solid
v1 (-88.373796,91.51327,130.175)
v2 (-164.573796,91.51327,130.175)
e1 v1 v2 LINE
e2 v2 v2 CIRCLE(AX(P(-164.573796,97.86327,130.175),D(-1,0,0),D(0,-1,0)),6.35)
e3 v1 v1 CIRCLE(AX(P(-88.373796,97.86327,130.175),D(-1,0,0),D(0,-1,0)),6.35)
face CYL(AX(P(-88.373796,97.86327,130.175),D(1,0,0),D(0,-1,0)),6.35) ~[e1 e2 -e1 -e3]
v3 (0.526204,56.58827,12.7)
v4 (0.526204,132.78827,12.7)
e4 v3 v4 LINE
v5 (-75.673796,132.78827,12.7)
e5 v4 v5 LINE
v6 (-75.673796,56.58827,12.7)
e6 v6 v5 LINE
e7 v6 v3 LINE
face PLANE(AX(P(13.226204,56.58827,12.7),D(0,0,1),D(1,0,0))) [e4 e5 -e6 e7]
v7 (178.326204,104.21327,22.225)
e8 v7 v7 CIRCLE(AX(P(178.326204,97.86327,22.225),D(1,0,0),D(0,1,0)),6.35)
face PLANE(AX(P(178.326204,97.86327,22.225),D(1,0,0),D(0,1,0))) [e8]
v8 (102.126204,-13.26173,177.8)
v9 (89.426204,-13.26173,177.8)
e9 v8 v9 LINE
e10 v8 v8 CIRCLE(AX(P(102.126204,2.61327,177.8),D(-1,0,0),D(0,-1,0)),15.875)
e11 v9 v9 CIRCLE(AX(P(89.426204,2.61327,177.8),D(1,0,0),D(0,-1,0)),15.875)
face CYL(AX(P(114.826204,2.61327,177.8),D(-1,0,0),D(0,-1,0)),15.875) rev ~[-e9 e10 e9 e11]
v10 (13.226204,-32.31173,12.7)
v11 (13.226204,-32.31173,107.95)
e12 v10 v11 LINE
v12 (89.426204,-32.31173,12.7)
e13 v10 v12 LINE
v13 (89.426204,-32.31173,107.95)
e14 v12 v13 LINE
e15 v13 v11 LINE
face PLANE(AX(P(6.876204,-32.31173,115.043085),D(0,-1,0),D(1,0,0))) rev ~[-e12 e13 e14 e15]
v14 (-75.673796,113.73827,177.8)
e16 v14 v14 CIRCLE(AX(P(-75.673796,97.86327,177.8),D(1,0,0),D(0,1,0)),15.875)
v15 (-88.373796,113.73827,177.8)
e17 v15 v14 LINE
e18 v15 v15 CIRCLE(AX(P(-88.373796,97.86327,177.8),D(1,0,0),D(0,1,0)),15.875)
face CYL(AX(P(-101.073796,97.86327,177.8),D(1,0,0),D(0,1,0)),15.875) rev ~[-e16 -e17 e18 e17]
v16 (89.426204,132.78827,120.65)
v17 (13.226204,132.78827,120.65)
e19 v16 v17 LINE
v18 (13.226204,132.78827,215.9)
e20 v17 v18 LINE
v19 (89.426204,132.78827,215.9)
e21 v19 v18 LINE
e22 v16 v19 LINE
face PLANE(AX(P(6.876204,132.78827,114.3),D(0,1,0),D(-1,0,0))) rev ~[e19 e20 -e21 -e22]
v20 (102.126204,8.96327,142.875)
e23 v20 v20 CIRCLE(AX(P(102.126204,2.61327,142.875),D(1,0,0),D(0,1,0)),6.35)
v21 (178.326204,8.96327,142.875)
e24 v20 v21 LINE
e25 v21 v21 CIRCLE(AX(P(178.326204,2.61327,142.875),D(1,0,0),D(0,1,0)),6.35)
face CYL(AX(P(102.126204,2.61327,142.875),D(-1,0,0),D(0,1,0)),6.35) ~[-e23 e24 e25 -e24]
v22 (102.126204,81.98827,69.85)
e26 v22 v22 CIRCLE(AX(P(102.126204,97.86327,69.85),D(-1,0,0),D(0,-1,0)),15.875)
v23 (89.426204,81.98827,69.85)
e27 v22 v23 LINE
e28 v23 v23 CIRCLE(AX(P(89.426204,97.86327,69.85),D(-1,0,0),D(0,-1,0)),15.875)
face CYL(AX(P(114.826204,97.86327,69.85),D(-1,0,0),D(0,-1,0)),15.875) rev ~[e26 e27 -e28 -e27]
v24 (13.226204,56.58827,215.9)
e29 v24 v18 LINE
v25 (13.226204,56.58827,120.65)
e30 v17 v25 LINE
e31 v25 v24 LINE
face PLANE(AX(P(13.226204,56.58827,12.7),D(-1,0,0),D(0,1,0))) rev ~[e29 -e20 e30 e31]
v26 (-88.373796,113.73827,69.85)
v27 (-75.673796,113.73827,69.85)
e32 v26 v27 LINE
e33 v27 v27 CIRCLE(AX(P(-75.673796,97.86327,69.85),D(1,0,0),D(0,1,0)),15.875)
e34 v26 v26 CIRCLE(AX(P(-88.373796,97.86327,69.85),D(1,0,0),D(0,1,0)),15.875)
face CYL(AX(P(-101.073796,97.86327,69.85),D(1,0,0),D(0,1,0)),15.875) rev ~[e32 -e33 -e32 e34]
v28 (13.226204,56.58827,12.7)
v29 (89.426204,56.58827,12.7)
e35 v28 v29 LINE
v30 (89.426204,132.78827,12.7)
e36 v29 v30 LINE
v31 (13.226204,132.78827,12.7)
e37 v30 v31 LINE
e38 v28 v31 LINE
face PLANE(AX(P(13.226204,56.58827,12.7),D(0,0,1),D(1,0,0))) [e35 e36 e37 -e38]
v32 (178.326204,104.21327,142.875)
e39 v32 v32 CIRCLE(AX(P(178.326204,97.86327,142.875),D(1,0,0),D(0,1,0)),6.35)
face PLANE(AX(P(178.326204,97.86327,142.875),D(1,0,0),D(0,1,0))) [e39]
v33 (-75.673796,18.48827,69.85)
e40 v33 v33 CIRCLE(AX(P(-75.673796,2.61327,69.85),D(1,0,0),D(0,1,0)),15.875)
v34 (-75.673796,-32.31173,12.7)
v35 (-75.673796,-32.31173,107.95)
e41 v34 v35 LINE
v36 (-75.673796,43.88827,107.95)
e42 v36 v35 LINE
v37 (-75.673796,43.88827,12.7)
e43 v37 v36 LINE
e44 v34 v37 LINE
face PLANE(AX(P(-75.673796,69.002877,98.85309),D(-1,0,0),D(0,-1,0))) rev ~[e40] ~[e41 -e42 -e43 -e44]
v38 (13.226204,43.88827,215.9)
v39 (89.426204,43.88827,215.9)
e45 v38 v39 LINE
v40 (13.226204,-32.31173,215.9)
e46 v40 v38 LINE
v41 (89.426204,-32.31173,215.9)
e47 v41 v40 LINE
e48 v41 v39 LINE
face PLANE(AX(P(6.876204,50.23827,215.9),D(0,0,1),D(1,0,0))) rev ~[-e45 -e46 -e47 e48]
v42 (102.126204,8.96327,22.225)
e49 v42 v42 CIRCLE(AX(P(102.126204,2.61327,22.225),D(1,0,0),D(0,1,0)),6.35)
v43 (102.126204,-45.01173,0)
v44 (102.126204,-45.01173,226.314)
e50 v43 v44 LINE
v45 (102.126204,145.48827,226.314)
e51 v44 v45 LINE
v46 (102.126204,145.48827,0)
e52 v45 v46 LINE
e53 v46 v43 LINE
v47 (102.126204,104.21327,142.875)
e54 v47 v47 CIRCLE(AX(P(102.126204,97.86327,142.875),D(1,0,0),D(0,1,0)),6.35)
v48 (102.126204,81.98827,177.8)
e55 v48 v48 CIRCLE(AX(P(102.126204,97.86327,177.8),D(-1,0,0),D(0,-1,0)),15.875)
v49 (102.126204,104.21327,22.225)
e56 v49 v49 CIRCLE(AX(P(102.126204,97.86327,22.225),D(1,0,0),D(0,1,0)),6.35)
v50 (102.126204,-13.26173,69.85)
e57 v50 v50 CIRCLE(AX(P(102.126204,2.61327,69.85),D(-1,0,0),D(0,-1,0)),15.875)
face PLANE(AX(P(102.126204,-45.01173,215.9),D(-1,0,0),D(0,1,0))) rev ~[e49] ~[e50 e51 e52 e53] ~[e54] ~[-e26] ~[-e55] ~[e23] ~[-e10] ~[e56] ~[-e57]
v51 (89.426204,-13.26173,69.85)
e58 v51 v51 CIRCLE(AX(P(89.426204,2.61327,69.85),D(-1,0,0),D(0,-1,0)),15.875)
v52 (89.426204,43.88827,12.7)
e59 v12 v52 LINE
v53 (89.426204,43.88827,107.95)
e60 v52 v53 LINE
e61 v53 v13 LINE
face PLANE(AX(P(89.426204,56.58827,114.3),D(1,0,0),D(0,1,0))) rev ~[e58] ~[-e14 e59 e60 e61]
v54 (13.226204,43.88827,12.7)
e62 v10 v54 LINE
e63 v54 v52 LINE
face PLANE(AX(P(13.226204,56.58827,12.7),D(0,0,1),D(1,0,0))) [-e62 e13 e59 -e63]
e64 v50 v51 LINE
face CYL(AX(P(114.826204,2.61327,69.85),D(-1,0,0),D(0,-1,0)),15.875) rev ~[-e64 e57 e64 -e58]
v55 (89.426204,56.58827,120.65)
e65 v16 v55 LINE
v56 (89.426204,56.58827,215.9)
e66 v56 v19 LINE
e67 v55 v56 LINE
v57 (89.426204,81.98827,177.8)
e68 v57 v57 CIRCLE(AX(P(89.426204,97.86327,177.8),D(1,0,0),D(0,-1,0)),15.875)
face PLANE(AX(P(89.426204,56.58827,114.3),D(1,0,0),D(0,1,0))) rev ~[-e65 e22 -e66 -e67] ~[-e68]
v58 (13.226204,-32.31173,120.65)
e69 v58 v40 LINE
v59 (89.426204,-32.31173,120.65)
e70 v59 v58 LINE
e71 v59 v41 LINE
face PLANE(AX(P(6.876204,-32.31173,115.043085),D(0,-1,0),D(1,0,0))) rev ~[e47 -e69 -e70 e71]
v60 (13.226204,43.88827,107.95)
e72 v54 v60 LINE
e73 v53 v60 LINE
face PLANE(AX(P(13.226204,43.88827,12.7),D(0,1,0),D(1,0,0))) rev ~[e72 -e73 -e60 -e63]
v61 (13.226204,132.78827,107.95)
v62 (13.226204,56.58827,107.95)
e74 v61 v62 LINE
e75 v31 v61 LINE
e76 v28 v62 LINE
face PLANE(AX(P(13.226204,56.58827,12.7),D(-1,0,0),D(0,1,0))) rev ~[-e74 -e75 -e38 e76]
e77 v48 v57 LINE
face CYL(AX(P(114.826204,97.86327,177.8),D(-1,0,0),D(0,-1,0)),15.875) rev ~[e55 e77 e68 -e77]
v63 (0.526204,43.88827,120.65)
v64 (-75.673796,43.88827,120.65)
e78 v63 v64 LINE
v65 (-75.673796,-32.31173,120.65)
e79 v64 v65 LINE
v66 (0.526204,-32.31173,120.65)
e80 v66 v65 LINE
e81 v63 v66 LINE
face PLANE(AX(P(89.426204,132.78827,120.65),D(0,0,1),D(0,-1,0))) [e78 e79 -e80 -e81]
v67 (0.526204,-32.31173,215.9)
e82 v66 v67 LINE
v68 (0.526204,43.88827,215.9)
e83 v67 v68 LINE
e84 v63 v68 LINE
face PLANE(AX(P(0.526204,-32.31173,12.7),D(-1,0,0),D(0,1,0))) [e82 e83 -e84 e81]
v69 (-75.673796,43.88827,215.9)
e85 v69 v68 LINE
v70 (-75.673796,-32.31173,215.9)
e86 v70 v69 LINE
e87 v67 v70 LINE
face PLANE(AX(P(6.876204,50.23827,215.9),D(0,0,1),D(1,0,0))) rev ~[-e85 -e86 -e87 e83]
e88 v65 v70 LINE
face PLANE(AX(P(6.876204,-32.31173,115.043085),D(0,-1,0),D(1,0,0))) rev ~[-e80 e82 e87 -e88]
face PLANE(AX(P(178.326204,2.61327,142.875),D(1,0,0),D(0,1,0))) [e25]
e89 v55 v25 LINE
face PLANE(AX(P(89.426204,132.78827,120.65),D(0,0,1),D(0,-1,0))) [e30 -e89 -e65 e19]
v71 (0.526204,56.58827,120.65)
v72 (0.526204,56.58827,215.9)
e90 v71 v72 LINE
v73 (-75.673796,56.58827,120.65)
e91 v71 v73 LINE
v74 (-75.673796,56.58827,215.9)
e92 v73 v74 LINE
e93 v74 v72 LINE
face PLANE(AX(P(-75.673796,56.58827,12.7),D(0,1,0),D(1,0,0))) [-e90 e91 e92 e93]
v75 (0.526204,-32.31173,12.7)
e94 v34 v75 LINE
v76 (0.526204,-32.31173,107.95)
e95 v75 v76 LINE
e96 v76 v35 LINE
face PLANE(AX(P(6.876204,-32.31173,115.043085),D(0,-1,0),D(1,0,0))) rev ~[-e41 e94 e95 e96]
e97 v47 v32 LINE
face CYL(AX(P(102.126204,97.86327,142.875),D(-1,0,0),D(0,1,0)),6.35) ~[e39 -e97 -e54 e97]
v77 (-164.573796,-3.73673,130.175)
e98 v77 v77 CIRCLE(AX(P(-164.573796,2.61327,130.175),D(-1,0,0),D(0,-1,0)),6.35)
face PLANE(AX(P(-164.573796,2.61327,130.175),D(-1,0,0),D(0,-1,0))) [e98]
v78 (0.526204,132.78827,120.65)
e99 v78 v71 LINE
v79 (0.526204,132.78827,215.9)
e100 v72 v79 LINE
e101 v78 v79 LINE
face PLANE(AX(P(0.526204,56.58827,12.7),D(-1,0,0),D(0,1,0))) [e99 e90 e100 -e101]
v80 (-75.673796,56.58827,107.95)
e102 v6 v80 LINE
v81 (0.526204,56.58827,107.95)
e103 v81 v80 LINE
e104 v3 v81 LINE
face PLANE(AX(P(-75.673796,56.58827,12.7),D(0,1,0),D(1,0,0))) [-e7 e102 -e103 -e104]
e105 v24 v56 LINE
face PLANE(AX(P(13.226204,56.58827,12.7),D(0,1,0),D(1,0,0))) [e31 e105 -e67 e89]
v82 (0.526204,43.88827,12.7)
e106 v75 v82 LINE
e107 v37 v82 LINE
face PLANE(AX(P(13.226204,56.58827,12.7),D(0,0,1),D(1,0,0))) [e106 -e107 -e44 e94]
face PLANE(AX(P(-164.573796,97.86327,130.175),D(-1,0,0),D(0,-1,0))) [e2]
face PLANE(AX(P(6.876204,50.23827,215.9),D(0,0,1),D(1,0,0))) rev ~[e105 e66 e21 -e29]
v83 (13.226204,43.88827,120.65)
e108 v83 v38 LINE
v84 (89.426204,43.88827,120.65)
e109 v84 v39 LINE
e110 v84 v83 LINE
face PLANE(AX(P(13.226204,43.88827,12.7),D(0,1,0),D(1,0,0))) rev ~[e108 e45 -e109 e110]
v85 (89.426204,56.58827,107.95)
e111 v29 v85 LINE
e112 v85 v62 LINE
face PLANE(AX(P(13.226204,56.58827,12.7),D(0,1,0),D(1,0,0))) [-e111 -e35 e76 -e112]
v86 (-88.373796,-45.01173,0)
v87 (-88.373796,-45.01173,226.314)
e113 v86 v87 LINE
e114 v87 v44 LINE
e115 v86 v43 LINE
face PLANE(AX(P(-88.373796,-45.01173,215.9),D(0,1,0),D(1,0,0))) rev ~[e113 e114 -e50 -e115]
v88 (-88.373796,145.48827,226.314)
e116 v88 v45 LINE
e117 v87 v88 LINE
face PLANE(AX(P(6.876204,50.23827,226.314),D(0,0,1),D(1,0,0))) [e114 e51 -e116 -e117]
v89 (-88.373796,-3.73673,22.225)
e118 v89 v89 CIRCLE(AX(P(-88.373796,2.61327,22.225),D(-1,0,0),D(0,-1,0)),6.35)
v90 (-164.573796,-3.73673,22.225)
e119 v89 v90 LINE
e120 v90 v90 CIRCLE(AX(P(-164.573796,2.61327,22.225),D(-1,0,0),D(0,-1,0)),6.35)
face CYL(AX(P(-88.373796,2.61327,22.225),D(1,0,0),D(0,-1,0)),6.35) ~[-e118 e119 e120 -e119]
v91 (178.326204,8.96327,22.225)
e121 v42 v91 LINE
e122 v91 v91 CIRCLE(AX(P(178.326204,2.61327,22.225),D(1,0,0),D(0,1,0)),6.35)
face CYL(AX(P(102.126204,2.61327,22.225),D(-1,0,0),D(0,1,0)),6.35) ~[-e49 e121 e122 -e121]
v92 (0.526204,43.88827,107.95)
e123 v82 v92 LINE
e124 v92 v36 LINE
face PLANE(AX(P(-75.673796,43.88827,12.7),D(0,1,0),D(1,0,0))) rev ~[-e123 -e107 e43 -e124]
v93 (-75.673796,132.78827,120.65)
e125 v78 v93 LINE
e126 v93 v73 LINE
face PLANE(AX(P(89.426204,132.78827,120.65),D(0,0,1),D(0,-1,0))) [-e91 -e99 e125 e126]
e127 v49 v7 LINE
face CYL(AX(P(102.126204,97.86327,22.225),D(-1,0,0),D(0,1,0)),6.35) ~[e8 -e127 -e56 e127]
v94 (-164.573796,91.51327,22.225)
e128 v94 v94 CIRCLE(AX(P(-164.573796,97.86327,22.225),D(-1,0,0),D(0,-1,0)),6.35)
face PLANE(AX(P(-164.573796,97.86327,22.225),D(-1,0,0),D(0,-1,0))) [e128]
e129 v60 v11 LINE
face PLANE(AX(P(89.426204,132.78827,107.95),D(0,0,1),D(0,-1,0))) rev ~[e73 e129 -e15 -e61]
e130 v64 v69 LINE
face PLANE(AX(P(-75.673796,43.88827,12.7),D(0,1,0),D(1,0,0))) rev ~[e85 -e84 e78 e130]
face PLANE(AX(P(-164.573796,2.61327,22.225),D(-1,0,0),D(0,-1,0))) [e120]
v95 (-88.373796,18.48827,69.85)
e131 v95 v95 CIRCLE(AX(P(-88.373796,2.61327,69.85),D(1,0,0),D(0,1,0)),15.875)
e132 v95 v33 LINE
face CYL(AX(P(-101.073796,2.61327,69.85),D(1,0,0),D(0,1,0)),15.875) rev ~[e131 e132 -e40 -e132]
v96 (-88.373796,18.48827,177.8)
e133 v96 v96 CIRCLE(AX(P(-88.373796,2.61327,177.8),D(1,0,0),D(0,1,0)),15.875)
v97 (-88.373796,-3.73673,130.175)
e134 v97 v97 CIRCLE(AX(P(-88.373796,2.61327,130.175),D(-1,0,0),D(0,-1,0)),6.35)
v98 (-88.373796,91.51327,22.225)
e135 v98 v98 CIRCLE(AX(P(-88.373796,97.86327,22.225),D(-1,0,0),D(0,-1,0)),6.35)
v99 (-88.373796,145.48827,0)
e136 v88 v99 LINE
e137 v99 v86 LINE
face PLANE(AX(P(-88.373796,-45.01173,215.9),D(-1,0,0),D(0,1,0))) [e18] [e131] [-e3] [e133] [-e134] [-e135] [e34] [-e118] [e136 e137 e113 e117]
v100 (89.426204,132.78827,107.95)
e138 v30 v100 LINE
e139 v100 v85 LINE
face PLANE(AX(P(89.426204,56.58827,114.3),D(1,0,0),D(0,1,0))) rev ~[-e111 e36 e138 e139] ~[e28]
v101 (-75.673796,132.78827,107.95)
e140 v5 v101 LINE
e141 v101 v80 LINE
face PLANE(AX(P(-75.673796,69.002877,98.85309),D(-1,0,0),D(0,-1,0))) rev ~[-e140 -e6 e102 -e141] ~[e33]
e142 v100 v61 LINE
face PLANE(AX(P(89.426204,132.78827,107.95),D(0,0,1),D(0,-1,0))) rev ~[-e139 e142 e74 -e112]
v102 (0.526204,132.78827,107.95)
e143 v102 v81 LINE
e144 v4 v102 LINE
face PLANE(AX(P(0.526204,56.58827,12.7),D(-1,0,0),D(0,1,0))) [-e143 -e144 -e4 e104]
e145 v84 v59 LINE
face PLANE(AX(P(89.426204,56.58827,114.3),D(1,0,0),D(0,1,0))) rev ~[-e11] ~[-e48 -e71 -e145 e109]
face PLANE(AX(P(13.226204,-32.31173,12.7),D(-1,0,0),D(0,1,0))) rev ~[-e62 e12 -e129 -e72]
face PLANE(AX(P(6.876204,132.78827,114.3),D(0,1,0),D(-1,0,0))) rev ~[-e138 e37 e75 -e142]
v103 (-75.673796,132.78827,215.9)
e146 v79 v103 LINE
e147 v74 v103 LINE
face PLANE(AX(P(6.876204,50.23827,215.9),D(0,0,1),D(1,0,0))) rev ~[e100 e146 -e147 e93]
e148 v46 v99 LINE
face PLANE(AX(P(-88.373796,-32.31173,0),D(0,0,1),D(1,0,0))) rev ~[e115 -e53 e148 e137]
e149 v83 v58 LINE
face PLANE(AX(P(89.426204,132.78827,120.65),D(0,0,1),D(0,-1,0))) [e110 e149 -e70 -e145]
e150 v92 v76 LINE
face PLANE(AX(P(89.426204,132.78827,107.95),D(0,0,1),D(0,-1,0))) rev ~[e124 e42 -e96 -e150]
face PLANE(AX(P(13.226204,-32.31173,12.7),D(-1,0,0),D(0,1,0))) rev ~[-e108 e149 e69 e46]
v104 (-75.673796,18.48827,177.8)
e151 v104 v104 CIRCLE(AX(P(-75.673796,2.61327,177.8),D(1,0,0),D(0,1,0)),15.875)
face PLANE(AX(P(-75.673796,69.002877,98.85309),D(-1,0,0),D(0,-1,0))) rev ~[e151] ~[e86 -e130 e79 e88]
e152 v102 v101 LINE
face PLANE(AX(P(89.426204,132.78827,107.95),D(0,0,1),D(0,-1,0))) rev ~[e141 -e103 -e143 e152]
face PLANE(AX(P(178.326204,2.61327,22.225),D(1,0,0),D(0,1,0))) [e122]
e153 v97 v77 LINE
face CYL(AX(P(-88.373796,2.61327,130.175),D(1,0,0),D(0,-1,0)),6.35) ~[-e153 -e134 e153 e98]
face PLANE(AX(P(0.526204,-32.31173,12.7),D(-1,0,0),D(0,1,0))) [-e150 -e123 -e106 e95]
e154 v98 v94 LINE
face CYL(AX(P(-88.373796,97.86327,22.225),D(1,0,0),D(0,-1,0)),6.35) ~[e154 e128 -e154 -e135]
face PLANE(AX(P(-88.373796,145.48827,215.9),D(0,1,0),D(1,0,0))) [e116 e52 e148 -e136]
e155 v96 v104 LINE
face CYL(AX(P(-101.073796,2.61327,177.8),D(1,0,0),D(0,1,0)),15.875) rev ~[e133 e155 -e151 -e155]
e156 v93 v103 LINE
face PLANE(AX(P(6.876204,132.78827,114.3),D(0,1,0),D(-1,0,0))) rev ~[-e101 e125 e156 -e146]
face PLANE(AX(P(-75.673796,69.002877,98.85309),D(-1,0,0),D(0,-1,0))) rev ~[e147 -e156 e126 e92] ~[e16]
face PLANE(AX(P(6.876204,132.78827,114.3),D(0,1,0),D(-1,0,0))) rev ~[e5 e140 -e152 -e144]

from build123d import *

# Parameters (mm, degrees)
F0_W      = 177.8
F0_H      = 177.8
F1_DEPTH  = 12.7
F2_W      = 177.8
F2_H      = 203.2
F3_DEPTH  = 12.7
F4_W      = 165.1
F4_H      = 203.2
F5_DEPTH  = 12.7
F6_W      = 165.1
F6_H      = 12.7
F7_DEPTH  = 165.1
F8_W      = 12.7
F8_H      = 76.2
F8_W_2    = 76.2
F8_H_2    = 12.7
F9_DEPTH  = 203.2
F10_W     = 76.2
F10_H     = 95.25
F11_DEPTH = 12.7
F12_W     = 76.2
F12_H     = 95.25
F13_DEPTH = 12.7
F15_D     = 31.75
F15_DEPTH = 12.7
F15_TIP   = 9.5386623271
F17_D     = 31.75
F17_DEPTH = 12.7
F17_TIP   = 9.5386623271
F18_W     = 190.5
F18_H     = 190.5
F19_DEPTH = 10.414
F14_R     = 6.35
F20_DEPTH = 76.2
F16_R     = 6.35
F21_DEPTH = 76.2


with BuildPart() as f1:
    # F0 (on Top) → F1 (new body)
    with BuildSketch(Plane.XY):
        with Locations((13.2262037635, 56.5882699132)):
            Rectangle(F0_W, F0_H)
    extrude(amount=F1_DEPTH)

    # F2 (on face) → F3 (join)
    with BuildSketch(Plane.YZ.offset(102.1262037635)):
        with Locations((56.5882699132, 114.3)):
            Rectangle(F2_W, F2_H)
    extrude(amount=-F3_DEPTH)

    # F4 (on face) → F5 (join)
    with BuildSketch(Plane(origin=(0, 145.4882699132, 0), x_dir=(-1, 0, 0), z_dir=(0, 1, 0))):
        with Locations((-6.8762037635, 114.3)):
            Rectangle(F4_W, F4_H)
    extrude(amount=-F5_DEPTH)

    # F6 (on face) → F7 (join, through all)
    with BuildSketch(Plane(origin=(89.4262037635, 0, 0), x_dir=(0, -1, 0), z_dir=(-1, 0, 0))):
        with Locations((-50.2382699132, 114.3)):
            Rectangle(F6_W, F6_H)
    extrude(amount=F7_DEPTH)

    # F8 (on face) → F9 (join, through all)
    with BuildSketch(Plane.XY.offset(12.7)):
        with Locations((6.8762037635, 94.6882699132)):
            Rectangle(F8_W, F8_H)
        with Locations((-37.5737962365, 50.2382699132)):
            Rectangle(F8_W_2, F8_H_2)
        with Locations((6.8762037635, 50.2382699132)):
            Rectangle(F8_W, F8_H_2)
        with Locations((6.8762037635, 5.7882699132)):
            Rectangle(F8_W, F8_H)
        with Locations((51.3262037635, 50.2382699132)):
            Rectangle(F8_W_2, F8_H_2)
    extrude(amount=F9_DEPTH)

    # F10 (on face) → F11 (join)
    with BuildSketch(Plane(origin=(-75.6737962365, 0, 0), x_dir=(0, -1, 0), z_dir=(-1, 0, 0))):
        Polygon((-132.7882699132, 215.9), (-145.4882699132, 215.9), (-145.4882699132, 0), (32.3117300868, 0), (32.3117300868, 12.7), (-43.8882699132, 12.7), (-43.8882699132, 107.95), (32.3117300868, 107.95), (32.3117300868, 120.65), (-43.8882699132, 120.65), (-43.8882699132, 215.9), (-56.5882699132, 215.9), (-56.5882699132, 120.65), (-132.7882699132, 120.65), align=None)
        with Locations((-94.6882699132, 60.325)):
            Rectangle(F10_W, F10_H, mode=Mode.SUBTRACT)
        with Locations((-94.6882699132, 168.275)):
            Rectangle(F10_W, F10_H)
        with Locations((-5.7882699132, 168.275)):
            Rectangle(F10_W, F10_H)
        with Locations((-5.7882699132, 60.325)):
            Rectangle(F10_W, F10_H)
        with Locations((-94.6882699132, 60.325)):
            Rectangle(F10_W, F10_H)
    extrude(amount=F11_DEPTH)

    # F12 (on face) → F13 (join)
    with BuildSketch(Plane.XZ.offset(32.3117300868)):
        Polygon((-75.6737962365, 215.9), (-88.3737962365, 215.9), (-88.3737962365, 0), (102.1262037635, 0), (102.1262037635, 215.9), (89.4262037635, 215.9), (89.4262037635, 120.65), (13.2262037635, 120.65), (13.2262037635, 215.9), (0.5262037635, 215.9), (0.5262037635, 120.65), (-75.6737962365, 120.65), align=None)
        with Locations((-37.5737962365, 60.325)):
            Rectangle(F12_W, F12_H, mode=Mode.SUBTRACT)
        with Locations((51.3262037635, 60.325)):
            Rectangle(F12_W, F12_H, mode=Mode.SUBTRACT)
        with Locations((-37.5737962365, 168.275)):
            Rectangle(F12_W, F12_H)
        with Locations((51.3262037635, 168.275)):
            Rectangle(F12_W, F12_H)
        with Locations((-37.5737962365, 60.325)):
            Rectangle(F12_W, F12_H)
        with Locations((51.3262037635, 60.325)):
            Rectangle(F12_W, F12_H)
    extrude(amount=F13_DEPTH)

    # F15
    with Locations(Plane.YZ.offset(102.1262037635)):
        with Locations((2.6132699132, 177.8), (97.8632699132, 177.8), (2.6132699132, 69.85), (97.8632699132, 69.85)):
            Hole(F15_D / 2, depth=F15_DEPTH)
            with Locations((0, 0, -(F15_DEPTH + F15_TIP / 2))):  # 118° drill point
                Cone(0, F15_D / 2, F15_TIP, mode=Mode.SUBTRACT)

    # F17
    with Locations(Plane(origin=(-88.3737962365, 0, 0), x_dir=(0, -1, 0), z_dir=(-1, 0, 0))):
        with Locations((-97.8632699132, 177.8), (-2.6132699132, 177.8), (-97.8632699132, 69.85), (-2.6132699132, 69.85)):
            Hole(F17_D / 2, depth=F17_DEPTH)
            with Locations((0, 0, -(F17_DEPTH + F17_TIP / 2))):  # 118° drill point
                Cone(0, F17_D / 2, F17_TIP, mode=Mode.SUBTRACT)

    # F18 (on face) → F19 (join)
    with BuildSketch(Plane.XY.offset(215.9)):
        with Locations((6.8762037635, 50.2382699132)):
            Rectangle(F18_W, F18_H)
    extrude(amount=F19_DEPTH)

    # F14 (on face) → F20 (join)
    with BuildSketch(Plane.YZ.offset(102.1262037635)):
        with Locations((2.6132699132, 142.875)):
            Circle(F14_R)
        with Locations((2.6132699132, 22.225)):
            Circle(F14_R)
        with Locations((97.8632699132, 142.875)):
            Circle(F14_R)
        with Locations((97.8632699132, 22.225)):
            Circle(F14_R)
    extrude(amount=F20_DEPTH)

    # F16 (on face) → F21 (join)
    with BuildSketch(Plane(origin=(-88.3737962365, 0, 0), x_dir=(0, -1, 0), z_dir=(-1, 0, 0))):
        with Locations((-97.8632699132, 130.175)):
            Circle(F16_R)
        with Locations((-97.8632699132, 22.225)):
            Circle(F16_R)
        with Locations((-2.6132699132, 130.175)):
            Circle(F16_R)
        with Locations((-2.6132699132, 22.225)):
            Circle(F16_R)
    extrude(amount=F21_DEPTH)


solid = f1.part
